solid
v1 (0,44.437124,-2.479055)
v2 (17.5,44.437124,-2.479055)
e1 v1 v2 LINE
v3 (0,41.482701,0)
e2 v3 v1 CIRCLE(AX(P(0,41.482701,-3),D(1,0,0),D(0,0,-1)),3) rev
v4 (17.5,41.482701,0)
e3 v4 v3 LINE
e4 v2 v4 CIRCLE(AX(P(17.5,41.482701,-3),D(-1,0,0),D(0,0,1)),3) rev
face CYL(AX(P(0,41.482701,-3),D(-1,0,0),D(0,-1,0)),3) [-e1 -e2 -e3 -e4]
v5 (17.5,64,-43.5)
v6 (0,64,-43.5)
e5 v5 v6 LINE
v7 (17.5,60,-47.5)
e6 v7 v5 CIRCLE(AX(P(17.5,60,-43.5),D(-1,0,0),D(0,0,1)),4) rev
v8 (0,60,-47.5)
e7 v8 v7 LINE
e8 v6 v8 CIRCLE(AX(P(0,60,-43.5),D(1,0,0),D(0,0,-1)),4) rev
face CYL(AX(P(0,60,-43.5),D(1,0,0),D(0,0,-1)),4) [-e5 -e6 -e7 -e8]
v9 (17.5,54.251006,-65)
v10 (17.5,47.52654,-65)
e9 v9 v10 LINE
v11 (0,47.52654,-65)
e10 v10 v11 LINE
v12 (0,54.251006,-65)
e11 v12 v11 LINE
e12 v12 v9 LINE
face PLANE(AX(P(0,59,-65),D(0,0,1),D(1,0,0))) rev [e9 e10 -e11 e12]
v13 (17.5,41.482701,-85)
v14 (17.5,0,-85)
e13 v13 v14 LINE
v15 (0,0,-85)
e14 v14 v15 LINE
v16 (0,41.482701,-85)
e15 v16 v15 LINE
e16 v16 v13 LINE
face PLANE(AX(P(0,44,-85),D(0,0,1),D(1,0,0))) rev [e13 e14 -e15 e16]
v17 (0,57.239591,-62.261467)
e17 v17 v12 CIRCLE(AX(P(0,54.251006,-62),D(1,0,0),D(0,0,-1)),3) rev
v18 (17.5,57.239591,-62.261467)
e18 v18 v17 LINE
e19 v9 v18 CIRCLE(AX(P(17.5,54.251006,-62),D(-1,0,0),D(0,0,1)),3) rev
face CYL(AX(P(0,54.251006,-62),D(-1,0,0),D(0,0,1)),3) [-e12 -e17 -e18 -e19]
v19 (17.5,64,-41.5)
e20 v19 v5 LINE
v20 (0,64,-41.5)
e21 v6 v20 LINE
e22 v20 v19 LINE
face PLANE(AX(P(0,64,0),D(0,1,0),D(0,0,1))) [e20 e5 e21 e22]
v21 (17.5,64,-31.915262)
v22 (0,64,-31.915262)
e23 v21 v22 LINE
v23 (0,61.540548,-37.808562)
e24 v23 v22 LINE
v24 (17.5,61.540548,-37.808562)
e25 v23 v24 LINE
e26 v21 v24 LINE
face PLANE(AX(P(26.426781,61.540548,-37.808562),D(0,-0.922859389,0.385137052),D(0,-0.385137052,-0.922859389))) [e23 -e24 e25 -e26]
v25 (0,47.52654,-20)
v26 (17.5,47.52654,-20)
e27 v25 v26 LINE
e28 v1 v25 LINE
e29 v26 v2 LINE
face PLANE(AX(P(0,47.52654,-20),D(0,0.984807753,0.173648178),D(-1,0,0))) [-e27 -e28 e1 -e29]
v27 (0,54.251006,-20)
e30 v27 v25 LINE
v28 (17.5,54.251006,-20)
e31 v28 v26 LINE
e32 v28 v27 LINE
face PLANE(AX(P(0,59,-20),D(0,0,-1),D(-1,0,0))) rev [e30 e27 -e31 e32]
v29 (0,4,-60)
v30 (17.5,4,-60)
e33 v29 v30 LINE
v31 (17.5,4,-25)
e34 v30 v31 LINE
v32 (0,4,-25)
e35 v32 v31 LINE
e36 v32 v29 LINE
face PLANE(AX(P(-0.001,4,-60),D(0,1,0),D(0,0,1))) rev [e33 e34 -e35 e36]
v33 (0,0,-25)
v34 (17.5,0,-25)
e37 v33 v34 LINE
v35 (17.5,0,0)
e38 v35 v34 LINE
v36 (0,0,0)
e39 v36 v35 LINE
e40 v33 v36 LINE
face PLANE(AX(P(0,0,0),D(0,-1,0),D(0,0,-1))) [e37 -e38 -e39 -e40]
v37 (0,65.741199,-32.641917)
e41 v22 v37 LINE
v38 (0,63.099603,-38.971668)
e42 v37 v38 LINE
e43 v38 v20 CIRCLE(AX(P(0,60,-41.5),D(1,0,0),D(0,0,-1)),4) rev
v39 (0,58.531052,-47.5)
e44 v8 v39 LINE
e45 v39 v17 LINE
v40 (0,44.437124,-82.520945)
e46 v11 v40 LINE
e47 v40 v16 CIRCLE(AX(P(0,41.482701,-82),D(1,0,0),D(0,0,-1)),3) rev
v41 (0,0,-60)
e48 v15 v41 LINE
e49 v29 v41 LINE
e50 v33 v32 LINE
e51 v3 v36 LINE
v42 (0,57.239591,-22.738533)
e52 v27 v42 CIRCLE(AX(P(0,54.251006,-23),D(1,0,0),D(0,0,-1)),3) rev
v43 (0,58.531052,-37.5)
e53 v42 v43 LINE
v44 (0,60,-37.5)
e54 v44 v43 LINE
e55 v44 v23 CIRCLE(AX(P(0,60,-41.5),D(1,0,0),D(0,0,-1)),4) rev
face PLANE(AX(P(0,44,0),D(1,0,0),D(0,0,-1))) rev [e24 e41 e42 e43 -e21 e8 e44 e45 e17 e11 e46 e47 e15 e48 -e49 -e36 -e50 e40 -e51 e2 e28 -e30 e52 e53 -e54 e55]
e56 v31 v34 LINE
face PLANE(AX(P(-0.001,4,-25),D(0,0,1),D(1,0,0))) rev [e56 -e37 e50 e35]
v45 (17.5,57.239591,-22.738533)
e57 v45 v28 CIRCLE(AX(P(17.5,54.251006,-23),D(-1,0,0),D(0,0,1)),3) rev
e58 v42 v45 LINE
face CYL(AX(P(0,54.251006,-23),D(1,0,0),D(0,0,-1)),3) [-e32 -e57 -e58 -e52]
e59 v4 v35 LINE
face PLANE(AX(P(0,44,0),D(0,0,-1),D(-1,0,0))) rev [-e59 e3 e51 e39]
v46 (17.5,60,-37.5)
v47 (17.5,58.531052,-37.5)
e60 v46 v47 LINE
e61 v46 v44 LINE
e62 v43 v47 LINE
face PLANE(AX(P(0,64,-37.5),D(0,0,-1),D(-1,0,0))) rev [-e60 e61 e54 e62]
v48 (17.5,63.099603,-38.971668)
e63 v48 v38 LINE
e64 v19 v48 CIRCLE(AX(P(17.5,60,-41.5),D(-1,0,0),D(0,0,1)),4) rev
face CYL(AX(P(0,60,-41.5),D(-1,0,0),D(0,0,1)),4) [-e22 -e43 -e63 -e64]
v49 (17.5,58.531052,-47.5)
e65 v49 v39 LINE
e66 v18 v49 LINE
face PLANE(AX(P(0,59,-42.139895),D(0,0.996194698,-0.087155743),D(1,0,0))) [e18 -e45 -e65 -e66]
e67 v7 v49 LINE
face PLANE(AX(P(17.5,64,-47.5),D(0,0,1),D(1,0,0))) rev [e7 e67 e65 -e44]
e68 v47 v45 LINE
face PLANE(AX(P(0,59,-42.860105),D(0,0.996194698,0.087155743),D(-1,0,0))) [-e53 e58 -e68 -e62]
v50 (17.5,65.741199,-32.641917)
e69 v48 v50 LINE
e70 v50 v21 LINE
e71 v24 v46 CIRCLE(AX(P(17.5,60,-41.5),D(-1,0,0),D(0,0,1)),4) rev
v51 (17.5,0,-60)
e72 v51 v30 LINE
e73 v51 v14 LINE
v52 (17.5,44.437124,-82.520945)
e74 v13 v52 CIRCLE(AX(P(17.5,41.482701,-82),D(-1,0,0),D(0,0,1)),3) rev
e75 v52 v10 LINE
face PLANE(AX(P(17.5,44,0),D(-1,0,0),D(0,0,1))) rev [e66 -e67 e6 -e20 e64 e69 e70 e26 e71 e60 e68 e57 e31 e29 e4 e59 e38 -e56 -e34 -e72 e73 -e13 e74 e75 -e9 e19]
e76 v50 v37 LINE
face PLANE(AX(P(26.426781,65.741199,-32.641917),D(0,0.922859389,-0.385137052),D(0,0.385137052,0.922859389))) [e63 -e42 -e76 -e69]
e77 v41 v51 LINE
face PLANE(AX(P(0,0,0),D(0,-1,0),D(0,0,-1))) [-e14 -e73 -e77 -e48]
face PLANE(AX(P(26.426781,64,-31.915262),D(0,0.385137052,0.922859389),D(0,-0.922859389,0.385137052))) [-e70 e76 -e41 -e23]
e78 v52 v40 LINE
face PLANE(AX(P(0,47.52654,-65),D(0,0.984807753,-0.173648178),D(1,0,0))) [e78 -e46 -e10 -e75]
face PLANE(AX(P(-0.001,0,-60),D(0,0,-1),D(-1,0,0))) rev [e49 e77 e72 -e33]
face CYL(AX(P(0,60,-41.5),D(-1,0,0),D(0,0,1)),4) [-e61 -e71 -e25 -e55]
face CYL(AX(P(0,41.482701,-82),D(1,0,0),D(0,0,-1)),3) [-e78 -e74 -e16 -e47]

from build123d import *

# Parameters (mm, degrees)
SKETCH_1_W          = 17.5
SKETCH_1_H          = 85
EXTRUDE_1_DEPTH     = 44
SKETCH_2_W          = 17.5
SKETCH_2_H          = 45
EXTRUDE_2_DEPTH     = 15
EXTRUDE_3_DEPTH     = 5
CHAMFER_1_SIZE2     = 3.526539614
CHAMFER_1_SIZE      = 20
CHAMFER_2_SIZE2     = 3.526539614
CHAMFER_2_SIZE      = 20
CHAMFER_3_SIZE      = 2
CHAMFER_3_SIZE_2    = 22.860104606
CHAMFER_4_SIZE      = 2
CHAMFER_4_SIZE_2    = 22.860104606
FILLET_START        = -1
FILLET_1_DEPTH      = 19
FILLET_2_R          = 4
EXTRUDE_5_DEPTH     = 17.5
CUT_EXTRUDE_1_REACH = 110.872
SKETCH_6_W          = 35
SKETCH_6_H          = 4


with BuildPart() as part:
    # Эскиз1 → Бобышка-Вытянуть1 (new body)
    with BuildSketch(Plane(origin=(0, 0, 0), x_dir=(1, 0, 0), z_dir=(0, 1, 0))):
        with Locations((8.75, 42.5)):
            Rectangle(SKETCH_1_W, SKETCH_1_H)
    extrude(amount=EXTRUDE_1_DEPTH)

    # Эскиз2 → Бобышка-Вытянуть2 (add)
    with BuildSketch(Plane(origin=(0, 44, 0), x_dir=(1, 0, 0), z_dir=(0, 1, 0))):
        with Locations((8.75, 42.5)):
            Rectangle(SKETCH_2_W, SKETCH_2_H)
    extrude(amount=EXTRUDE_2_DEPTH)

    # Эскиз3 → Бобышка-Вытянуть3 (add)
    with BuildSketch(Plane(origin=(0, 59, 0), x_dir=(1, 0, 0), z_dir=(0, 1, 0))):
        Polygon((17.5, 42.5), (17.5, 47.5), (0, 47.5), (0, 42.5), (0, 37.5), (17.5, 37.5), align=None)
    extrude(amount=EXTRUDE_3_DEPTH)

    # Фаска1
    chamfer_1_edges = [part.edges().sort_by_distance(p)[0] for p in [
        (8.75, 44, -65),
    ]]
    chamfer_1_side = [part.faces().sort_by_distance(p)[0] for p in [
        (8.75, 44, -65.070530792),
    ]]
    chamfer(chamfer_1_edges, length=CHAMFER_1_SIZE - 0.0001, length2=CHAMFER_1_SIZE2 - 0.0001, reference=chamfer_1_side[0])  # a hair under: the kernel refuses the full size

    # Фаска2
    chamfer_2_edges = [part.edges().sort_by_distance(p)[0] for p in [
        (8.75, 44, -20),
    ]]
    chamfer_2_side = [part.faces().sort_by_distance(p)[0] for p in [
        (8.75, 44, -19.929469208),
    ]]
    chamfer(chamfer_2_edges, length=CHAMFER_2_SIZE - 0.0001, length2=CHAMFER_2_SIZE2 - 0.0001, reference=chamfer_2_side[0])  # a hair under: the kernel refuses the full size

    # Фаска3
    # the kernel refuses this chamfer: 22.860104606, 2 mm, written as the material it takes off along each edge
    with BuildSketch(Plane(origin=(-59.427907001, 59, -65), x_dir=(0, -1, 0), z_dir=(1, 0, 0))) as chamfer_3_piece_1_section:
        Polygon((CHAMFER_3_SIZE, 0), (0, -CHAMFER_3_SIZE_2), (0, 0), align=None)
    chamfer_3_piece_1 = extrude(amount=136.355814002, mode=Mode.PRIVATE)
    chamfer_3_piece_1 = split(chamfer_3_piece_1, bisect_by=Plane(origin=(-59.427907001, 59, -47.5), z_dir=(0, 0, -1)), keep=Keep.TOP, mode=Mode.PRIVATE)
    add(chamfer_3_piece_1, mode=Mode.SUBTRACT)

    # Фаска4
    # the kernel refuses this chamfer: 22.860104606, 2 mm, written as the material it takes off along each edge
    with BuildSketch(Plane(origin=(76.927907001, 59, -20), x_dir=(0, -1, 0), z_dir=(-1, 0, 0))) as chamfer_4_piece_1_section:
        Polygon((CHAMFER_4_SIZE, 0), (0, -CHAMFER_4_SIZE_2), (0, 0), align=None)
    chamfer_4_piece_1 = extrude(amount=136.355814002, mode=Mode.PRIVATE)
    chamfer_4_piece_1 = split(chamfer_4_piece_1, bisect_by=Plane(origin=(76.927907001, 59, -37.5), z_dir=(0, 0, 1)), keep=Keep.TOP, mode=Mode.PRIVATE)
    add(chamfer_4_piece_1, mode=Mode.SUBTRACT)

    # Скругление1: read off the stored shape, not the designer's step
    # Скругление1 outline → Скругление1 (cut)
    with BuildSketch(Plane.YZ.offset(FILLET_START)):
        with BuildLine():
            Line((44, 0), (41.482701106, 0))
            ThreePointArc((41.482701106, 0), (43.411063935, -0.701866671), (44.437124366, -2.479055467))
            Line((44.437124366, -2.479055467), (44, 0))
        make_face()
        with BuildLine():
            Line((57, -20), (54.251006478, -20))
            ThreePointArc((54.251006478, -20), (56.277777101, -20.78816799), (57.239590572, -22.738532772))
            Line((57.239590572, -22.738532772), (57, -20))
        make_face()
        with BuildLine():
            Line((57, -65), (57.239590572, -62.261467228))
            ThreePointArc((57.239590572, -62.261467228), (56.277777101, -64.21183201), (54.251006478, -65))
            Line((54.251006478, -65), (57, -65))
        make_face()
        with BuildLine():
            Line((44, -85), (44.437124366, -82.520944533))
            ThreePointArc((44.437124366, -82.520944533), (43.411063935, -84.298133329), (41.482701106, -85))
            Line((41.482701106, -85), (44, -85))
        make_face()
    extrude(amount=FILLET_1_DEPTH, mode=Mode.SUBTRACT)

    # Скругление2
    fillet_2_edges = [part.edges().sort_by_distance(p)[0] for p in [
        (8.75, 64, -47.5),
        (8.75, 64, -37.5),
    ]]
    fillet(fillet_2_edges, radius=FILLET_2_R)

    # Эскиз5 → Бобышка-Вытянуть5 (add)
    with BuildSketch(Plane.ZY):
        Polygon((-37.808562445, 61.540548206), (-31.915262461, 64), (-32.641917341, 65.741199076), (-39.550806856, 62.857911145), (-38.824151977, 61.11671207), align=None)
    extrude(amount=-EXTRUDE_5_DEPTH)

    # Эскиз6 → Вырез-Вытянуть1 (cut, up to next)
    with BuildSketch(Plane(origin=(17.5, 0, 0), x_dir=(0, 0, -1), z_dir=(1, 0, 0)), mode=Mode.PRIVATE) as cut_extrude_1_sk1:
        with Locations((42.5, 2)):
            Rectangle(SKETCH_6_W, SKETCH_6_H)
    cut_extrude_1_tool1 = extrude(cut_extrude_1_sk1.sketch, amount=-CUT_EXTRUDE_1_REACH, mode=Mode.PRIVATE) & part.part
    add(cut_extrude_1_tool1.solids().sort_by_distance((17.5, 2, -42.5))[0], mode=Mode.SUBTRACT)


solid = part.part
